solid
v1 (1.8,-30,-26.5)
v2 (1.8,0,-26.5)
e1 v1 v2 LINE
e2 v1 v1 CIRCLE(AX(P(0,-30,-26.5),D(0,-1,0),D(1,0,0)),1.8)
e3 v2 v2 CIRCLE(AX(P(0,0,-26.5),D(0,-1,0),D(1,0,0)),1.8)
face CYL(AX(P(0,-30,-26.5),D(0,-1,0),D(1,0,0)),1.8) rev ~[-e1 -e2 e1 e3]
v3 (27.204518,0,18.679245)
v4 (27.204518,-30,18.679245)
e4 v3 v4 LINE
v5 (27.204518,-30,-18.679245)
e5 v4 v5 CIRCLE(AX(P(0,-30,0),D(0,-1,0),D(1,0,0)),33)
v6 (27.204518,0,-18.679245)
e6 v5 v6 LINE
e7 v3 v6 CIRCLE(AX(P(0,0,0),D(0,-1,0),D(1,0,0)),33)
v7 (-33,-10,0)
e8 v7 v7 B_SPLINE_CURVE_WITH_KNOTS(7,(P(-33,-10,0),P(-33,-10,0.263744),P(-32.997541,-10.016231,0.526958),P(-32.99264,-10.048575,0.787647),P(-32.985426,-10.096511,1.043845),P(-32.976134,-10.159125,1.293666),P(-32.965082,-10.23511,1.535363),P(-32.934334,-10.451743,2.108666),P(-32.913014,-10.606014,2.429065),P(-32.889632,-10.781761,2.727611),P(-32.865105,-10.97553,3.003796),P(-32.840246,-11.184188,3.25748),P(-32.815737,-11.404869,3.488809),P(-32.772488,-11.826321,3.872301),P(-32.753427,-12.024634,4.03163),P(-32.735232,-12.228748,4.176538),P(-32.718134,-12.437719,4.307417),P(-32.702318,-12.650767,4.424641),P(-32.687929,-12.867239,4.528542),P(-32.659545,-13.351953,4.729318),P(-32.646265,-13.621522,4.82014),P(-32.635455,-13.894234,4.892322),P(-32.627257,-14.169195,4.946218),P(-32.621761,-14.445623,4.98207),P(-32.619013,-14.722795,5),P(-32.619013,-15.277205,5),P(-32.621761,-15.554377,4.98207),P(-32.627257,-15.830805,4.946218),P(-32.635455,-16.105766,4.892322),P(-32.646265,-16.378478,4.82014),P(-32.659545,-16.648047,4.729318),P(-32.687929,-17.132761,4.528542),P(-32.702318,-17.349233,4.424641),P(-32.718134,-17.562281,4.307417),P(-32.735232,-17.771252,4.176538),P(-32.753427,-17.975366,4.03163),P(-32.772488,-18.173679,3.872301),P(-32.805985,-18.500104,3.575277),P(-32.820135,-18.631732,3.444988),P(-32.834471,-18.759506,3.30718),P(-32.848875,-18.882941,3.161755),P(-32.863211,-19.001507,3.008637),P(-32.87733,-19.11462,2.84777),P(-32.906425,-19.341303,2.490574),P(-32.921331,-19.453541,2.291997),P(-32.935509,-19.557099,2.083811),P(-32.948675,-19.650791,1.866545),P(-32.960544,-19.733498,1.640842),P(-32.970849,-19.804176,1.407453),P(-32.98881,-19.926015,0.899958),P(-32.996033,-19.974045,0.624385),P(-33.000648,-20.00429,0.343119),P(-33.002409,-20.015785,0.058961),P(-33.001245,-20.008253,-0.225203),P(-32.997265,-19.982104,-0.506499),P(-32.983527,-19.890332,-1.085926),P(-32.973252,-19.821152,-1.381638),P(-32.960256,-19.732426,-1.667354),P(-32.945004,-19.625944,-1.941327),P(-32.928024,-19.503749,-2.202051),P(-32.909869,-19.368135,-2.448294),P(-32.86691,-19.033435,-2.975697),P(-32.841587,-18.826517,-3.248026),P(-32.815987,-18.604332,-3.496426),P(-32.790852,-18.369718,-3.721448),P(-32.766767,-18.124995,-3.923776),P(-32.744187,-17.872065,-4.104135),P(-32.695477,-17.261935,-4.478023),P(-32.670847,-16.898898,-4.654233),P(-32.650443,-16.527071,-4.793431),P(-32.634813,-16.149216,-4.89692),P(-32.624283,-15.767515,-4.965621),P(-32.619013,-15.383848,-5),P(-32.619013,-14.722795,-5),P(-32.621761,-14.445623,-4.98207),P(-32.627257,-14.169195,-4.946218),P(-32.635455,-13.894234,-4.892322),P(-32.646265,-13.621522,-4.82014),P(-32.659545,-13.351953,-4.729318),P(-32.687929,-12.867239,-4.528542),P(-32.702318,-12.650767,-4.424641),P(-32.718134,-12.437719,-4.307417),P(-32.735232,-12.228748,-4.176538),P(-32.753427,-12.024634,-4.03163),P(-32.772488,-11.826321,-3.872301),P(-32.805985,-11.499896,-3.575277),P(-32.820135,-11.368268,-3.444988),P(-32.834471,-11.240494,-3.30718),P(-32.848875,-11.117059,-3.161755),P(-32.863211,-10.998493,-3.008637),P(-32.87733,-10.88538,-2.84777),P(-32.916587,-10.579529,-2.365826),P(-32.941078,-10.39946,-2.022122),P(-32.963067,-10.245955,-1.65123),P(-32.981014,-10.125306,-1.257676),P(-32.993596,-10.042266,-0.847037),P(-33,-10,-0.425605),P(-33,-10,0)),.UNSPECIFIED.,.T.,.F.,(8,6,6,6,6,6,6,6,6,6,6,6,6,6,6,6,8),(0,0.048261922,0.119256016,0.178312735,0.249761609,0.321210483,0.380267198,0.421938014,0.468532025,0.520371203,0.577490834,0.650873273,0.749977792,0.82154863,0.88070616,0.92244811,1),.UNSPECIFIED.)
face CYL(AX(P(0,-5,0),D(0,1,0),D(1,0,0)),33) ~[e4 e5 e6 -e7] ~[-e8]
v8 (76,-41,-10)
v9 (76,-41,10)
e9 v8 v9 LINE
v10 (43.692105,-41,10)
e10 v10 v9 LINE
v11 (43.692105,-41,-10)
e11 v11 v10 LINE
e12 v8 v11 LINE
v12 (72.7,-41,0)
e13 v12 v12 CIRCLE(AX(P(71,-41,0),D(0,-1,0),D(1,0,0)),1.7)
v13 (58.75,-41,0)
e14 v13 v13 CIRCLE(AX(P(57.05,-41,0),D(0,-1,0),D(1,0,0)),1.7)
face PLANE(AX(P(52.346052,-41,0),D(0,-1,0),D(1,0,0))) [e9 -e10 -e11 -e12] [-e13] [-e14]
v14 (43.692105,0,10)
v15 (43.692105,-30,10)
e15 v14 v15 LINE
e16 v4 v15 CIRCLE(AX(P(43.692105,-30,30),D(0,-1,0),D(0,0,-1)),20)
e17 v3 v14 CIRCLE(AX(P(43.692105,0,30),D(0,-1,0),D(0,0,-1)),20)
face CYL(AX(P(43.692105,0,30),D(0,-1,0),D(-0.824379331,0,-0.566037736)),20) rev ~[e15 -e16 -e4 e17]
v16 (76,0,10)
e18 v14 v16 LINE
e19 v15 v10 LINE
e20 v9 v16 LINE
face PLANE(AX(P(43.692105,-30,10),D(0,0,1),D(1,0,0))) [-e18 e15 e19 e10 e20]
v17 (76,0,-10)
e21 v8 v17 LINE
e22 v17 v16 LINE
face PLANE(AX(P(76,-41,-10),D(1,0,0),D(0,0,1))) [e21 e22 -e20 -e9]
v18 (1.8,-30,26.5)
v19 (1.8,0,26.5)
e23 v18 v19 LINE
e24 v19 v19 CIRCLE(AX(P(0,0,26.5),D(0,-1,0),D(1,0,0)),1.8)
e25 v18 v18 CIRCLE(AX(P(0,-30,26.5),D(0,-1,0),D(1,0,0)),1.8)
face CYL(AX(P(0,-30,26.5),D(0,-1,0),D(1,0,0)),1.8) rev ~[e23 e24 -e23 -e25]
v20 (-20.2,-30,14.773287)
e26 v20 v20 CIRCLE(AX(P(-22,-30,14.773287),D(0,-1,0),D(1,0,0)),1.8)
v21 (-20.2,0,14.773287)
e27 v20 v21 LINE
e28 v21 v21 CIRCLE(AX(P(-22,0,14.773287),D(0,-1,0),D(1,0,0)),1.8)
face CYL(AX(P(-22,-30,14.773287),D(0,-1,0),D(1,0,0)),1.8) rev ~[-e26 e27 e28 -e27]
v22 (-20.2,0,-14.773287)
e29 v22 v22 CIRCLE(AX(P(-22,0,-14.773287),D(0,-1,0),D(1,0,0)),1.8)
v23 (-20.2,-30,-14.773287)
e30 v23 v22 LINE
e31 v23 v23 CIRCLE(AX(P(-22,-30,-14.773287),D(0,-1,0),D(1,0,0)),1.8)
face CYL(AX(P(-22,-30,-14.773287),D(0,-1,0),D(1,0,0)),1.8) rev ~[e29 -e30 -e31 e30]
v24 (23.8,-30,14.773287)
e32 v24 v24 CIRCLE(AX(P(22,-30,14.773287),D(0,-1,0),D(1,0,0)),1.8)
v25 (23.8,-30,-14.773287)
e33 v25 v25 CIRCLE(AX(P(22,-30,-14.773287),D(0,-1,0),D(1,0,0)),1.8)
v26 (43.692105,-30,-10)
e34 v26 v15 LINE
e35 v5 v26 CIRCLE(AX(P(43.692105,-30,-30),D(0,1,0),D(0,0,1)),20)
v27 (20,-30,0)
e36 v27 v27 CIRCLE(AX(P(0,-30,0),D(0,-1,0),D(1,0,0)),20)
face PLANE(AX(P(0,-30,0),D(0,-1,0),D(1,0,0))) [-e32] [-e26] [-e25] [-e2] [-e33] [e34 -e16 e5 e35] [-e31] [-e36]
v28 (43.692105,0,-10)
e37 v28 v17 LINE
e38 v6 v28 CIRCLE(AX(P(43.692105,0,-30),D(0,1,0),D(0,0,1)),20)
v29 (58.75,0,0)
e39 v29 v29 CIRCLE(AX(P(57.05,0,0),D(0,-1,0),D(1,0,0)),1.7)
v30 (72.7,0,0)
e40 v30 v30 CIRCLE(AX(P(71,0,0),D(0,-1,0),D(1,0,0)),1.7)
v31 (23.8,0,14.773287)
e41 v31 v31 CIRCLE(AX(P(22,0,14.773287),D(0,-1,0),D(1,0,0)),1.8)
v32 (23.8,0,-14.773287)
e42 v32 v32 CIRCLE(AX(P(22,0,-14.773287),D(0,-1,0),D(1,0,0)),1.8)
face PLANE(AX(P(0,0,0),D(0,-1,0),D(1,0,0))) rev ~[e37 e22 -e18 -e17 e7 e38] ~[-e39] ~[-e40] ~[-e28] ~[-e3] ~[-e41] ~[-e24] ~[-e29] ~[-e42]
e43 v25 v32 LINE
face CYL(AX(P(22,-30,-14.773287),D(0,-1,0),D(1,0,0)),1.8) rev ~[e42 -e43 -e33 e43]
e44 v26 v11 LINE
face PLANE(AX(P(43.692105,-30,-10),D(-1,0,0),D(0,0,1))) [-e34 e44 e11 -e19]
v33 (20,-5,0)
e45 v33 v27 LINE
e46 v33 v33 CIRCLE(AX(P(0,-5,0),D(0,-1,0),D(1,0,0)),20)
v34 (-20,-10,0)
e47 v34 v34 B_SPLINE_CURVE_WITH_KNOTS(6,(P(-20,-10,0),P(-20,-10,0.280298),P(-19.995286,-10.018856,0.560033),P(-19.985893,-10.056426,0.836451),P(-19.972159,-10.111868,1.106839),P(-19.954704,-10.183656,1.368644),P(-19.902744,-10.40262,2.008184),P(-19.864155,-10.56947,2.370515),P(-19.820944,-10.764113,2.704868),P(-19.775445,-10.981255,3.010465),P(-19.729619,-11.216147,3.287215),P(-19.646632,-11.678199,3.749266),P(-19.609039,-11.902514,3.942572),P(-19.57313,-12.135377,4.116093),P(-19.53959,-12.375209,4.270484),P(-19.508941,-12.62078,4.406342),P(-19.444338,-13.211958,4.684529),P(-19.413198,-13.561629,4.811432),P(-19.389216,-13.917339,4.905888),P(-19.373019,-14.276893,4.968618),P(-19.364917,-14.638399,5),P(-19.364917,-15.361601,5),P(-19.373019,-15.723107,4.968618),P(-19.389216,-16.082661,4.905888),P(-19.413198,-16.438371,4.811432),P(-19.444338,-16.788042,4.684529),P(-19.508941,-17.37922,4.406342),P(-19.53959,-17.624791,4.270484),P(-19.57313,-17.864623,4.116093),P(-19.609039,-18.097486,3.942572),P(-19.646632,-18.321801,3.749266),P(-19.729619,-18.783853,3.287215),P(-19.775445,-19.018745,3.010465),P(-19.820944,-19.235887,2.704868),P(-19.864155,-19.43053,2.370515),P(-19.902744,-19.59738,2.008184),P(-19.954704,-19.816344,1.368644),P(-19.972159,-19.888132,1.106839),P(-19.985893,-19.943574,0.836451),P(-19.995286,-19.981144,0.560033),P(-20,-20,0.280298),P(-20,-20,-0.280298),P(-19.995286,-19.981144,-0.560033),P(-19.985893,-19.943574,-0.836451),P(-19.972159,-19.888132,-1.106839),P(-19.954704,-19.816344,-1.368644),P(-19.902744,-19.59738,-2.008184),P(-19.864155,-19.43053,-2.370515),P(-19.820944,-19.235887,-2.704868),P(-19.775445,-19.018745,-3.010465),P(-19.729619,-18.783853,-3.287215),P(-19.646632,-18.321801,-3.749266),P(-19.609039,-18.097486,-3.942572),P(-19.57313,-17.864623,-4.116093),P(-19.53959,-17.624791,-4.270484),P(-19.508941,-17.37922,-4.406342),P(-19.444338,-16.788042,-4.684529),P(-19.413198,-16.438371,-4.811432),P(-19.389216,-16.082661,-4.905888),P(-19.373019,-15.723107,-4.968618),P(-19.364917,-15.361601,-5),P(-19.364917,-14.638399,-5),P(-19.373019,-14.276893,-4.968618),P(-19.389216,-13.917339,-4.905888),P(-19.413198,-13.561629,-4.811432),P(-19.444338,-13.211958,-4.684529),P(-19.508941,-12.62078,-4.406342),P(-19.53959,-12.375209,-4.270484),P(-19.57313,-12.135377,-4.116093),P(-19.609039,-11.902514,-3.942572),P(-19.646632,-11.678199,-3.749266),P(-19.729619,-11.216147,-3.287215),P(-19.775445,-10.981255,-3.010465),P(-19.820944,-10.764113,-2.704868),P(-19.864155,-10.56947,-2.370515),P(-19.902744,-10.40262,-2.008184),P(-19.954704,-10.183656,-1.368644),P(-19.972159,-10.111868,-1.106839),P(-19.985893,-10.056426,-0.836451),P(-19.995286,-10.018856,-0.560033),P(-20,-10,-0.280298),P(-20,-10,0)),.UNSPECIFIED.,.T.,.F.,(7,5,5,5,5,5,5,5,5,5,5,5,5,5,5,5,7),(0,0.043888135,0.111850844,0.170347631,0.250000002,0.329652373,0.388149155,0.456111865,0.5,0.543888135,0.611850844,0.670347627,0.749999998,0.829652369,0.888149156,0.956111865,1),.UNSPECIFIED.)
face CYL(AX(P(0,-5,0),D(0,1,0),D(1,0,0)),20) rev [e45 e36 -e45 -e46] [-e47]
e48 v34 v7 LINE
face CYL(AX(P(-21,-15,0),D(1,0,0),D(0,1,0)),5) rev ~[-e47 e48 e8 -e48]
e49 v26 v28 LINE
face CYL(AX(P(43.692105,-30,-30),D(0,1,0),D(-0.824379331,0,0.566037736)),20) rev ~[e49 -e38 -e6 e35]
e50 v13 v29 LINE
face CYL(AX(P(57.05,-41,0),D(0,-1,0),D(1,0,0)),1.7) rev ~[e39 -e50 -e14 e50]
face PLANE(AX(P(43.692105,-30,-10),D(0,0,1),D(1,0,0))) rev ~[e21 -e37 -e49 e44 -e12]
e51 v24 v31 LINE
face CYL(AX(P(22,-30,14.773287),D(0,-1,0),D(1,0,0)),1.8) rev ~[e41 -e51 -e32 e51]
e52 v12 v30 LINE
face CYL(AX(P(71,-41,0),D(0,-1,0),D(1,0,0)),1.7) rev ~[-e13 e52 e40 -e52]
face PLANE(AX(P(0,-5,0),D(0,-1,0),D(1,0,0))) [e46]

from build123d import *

# Parameters (mm, degrees)
F0_R           = 33
F1_DEPTH       = 5
F2_R           = 33
F2_R_2         = 20
F3_DEPTH       = 25
F4_R           = 1.8
F5_DEPTH       = 30.001
F7_W           = 20
F7_H           = 20
F8_DEPTH       = 52
F9_W           = 52
F9_H           = 20
F12_DEPTH      = 10
F11_R          = 5
F13_DEPTH      = 12.001
F13_DEPTH_BACK = 10
F14_R          = 20
F15_W          = 20
F15_H          = 20
F16_DEPTH      = 11
F17_R          = 1.7
F18_DEPTH      = 41.0010001
F19_W          = 17.3078954501
F19_H          = 20
F20_DEPTH      = 11
F21_R          = 1.7
F22_DEPTH      = 41.0010001
F23_W          = 5
F23_H          = 20
F24_DEPTH      = 41.0010001


# Not quite as in the source:
# - a feature names something its author has since deleted; it is built from what else it names


with BuildPart() as f1:
    # F0 (on Front) → F1 (new body)
    with BuildSketch(Plane.XZ):
        Circle(F0_R)
    extrude(amount=F1_DEPTH)

    # F2 (on face) → F3 (join)
    with BuildSketch(Plane.XZ.offset(5)):
        Circle(F2_R)
        Circle(F2_R_2, mode=Mode.SUBTRACT)
    extrude(amount=F3_DEPTH)

    # F4 (on face) → F5 (cut, through all)
    with BuildSketch(Plane.XZ.offset(30)):
        with Locations((0, 26.5)):
            Circle(F4_R)
        with Locations((22, 14.7732867027)):
            Circle(F4_R)
        with Locations((-22, 14.7732867027)):
            Circle(F4_R)
        with Locations((0, -26.5)):
            Circle(F4_R)
        with Locations((-22, -14.7732867027)):
            Circle(F4_R)
        with Locations((22, -14.7732867027)):
            Circle(F4_R)
    extrude(amount=-F5_DEPTH, mode=Mode.SUBTRACT)

    # F7 (on offset) → F8 (join)
    with BuildSketch(Plane.YZ.offset(29)):
        with Locations((-10, 0)):
            Rectangle(F7_W, F7_H)
    extrude(amount=F8_DEPTH)

    # F9 (on face) → F12 (join)
    with BuildSketch(Plane.XZ.offset(20)):
        with Locations((55, 0)):
            Rectangle(F9_W, F9_H)
    extrude(amount=F12_DEPTH)

    # F11 (on offset) → F13 (cut, two sides)
    with BuildSketch(Plane.YZ.offset(-21)) as f13_sk:
        with Locations((-15, 0)):
            Circle(F11_R)
    extrude(amount=-F13_DEPTH, mode=Mode.SUBTRACT)
    extrude(f13_sk.sketch, amount=F13_DEPTH_BACK, mode=Mode.SUBTRACT)

    # F14
    f14_edges = [f1.edges().sort_by_distance(p)[0] for p in [
        (31.44837, -15, -10),
        (31.44837, -15, 10),
    ]]
    fillet(f14_edges, radius=F14_R)

    # F15 (on face) → F16 (join)
    with BuildSketch(Plane.XZ.offset(30)):
        with Locations((71, 0)):
            Rectangle(F15_W, F15_H)
    extrude(amount=F16_DEPTH)

    # F17 (on face) → F18 (cut, through all)
    with BuildSketch(Plane.XZ.offset(41)):
        with Locations((71, 0)):
            Circle(F17_R)
    extrude(amount=-F18_DEPTH, mode=Mode.SUBTRACT)

    # F19 (on face) → F20 (join)
    with BuildSketch(Plane.XZ.offset(30)):
        with Locations((52.346052275, 0)):
            Rectangle(F19_W, F19_H)
    extrude(amount=F20_DEPTH)

    # F21 (on face) → F22 (cut, through all)
    with BuildSketch(Plane.XZ.offset(41)):
        with Locations((57.05, 0)):
            Circle(F21_R)
    extrude(amount=-F22_DEPTH, mode=Mode.SUBTRACT)

    # F23 (on face) → F24 (cut, through all)
    with BuildSketch(Plane.XZ.offset(41)):
        with Locations((78.5, 0)):
            Rectangle(F23_W, F23_H)
    extrude(amount=-F24_DEPTH, mode=Mode.SUBTRACT)


solid = f1.part
